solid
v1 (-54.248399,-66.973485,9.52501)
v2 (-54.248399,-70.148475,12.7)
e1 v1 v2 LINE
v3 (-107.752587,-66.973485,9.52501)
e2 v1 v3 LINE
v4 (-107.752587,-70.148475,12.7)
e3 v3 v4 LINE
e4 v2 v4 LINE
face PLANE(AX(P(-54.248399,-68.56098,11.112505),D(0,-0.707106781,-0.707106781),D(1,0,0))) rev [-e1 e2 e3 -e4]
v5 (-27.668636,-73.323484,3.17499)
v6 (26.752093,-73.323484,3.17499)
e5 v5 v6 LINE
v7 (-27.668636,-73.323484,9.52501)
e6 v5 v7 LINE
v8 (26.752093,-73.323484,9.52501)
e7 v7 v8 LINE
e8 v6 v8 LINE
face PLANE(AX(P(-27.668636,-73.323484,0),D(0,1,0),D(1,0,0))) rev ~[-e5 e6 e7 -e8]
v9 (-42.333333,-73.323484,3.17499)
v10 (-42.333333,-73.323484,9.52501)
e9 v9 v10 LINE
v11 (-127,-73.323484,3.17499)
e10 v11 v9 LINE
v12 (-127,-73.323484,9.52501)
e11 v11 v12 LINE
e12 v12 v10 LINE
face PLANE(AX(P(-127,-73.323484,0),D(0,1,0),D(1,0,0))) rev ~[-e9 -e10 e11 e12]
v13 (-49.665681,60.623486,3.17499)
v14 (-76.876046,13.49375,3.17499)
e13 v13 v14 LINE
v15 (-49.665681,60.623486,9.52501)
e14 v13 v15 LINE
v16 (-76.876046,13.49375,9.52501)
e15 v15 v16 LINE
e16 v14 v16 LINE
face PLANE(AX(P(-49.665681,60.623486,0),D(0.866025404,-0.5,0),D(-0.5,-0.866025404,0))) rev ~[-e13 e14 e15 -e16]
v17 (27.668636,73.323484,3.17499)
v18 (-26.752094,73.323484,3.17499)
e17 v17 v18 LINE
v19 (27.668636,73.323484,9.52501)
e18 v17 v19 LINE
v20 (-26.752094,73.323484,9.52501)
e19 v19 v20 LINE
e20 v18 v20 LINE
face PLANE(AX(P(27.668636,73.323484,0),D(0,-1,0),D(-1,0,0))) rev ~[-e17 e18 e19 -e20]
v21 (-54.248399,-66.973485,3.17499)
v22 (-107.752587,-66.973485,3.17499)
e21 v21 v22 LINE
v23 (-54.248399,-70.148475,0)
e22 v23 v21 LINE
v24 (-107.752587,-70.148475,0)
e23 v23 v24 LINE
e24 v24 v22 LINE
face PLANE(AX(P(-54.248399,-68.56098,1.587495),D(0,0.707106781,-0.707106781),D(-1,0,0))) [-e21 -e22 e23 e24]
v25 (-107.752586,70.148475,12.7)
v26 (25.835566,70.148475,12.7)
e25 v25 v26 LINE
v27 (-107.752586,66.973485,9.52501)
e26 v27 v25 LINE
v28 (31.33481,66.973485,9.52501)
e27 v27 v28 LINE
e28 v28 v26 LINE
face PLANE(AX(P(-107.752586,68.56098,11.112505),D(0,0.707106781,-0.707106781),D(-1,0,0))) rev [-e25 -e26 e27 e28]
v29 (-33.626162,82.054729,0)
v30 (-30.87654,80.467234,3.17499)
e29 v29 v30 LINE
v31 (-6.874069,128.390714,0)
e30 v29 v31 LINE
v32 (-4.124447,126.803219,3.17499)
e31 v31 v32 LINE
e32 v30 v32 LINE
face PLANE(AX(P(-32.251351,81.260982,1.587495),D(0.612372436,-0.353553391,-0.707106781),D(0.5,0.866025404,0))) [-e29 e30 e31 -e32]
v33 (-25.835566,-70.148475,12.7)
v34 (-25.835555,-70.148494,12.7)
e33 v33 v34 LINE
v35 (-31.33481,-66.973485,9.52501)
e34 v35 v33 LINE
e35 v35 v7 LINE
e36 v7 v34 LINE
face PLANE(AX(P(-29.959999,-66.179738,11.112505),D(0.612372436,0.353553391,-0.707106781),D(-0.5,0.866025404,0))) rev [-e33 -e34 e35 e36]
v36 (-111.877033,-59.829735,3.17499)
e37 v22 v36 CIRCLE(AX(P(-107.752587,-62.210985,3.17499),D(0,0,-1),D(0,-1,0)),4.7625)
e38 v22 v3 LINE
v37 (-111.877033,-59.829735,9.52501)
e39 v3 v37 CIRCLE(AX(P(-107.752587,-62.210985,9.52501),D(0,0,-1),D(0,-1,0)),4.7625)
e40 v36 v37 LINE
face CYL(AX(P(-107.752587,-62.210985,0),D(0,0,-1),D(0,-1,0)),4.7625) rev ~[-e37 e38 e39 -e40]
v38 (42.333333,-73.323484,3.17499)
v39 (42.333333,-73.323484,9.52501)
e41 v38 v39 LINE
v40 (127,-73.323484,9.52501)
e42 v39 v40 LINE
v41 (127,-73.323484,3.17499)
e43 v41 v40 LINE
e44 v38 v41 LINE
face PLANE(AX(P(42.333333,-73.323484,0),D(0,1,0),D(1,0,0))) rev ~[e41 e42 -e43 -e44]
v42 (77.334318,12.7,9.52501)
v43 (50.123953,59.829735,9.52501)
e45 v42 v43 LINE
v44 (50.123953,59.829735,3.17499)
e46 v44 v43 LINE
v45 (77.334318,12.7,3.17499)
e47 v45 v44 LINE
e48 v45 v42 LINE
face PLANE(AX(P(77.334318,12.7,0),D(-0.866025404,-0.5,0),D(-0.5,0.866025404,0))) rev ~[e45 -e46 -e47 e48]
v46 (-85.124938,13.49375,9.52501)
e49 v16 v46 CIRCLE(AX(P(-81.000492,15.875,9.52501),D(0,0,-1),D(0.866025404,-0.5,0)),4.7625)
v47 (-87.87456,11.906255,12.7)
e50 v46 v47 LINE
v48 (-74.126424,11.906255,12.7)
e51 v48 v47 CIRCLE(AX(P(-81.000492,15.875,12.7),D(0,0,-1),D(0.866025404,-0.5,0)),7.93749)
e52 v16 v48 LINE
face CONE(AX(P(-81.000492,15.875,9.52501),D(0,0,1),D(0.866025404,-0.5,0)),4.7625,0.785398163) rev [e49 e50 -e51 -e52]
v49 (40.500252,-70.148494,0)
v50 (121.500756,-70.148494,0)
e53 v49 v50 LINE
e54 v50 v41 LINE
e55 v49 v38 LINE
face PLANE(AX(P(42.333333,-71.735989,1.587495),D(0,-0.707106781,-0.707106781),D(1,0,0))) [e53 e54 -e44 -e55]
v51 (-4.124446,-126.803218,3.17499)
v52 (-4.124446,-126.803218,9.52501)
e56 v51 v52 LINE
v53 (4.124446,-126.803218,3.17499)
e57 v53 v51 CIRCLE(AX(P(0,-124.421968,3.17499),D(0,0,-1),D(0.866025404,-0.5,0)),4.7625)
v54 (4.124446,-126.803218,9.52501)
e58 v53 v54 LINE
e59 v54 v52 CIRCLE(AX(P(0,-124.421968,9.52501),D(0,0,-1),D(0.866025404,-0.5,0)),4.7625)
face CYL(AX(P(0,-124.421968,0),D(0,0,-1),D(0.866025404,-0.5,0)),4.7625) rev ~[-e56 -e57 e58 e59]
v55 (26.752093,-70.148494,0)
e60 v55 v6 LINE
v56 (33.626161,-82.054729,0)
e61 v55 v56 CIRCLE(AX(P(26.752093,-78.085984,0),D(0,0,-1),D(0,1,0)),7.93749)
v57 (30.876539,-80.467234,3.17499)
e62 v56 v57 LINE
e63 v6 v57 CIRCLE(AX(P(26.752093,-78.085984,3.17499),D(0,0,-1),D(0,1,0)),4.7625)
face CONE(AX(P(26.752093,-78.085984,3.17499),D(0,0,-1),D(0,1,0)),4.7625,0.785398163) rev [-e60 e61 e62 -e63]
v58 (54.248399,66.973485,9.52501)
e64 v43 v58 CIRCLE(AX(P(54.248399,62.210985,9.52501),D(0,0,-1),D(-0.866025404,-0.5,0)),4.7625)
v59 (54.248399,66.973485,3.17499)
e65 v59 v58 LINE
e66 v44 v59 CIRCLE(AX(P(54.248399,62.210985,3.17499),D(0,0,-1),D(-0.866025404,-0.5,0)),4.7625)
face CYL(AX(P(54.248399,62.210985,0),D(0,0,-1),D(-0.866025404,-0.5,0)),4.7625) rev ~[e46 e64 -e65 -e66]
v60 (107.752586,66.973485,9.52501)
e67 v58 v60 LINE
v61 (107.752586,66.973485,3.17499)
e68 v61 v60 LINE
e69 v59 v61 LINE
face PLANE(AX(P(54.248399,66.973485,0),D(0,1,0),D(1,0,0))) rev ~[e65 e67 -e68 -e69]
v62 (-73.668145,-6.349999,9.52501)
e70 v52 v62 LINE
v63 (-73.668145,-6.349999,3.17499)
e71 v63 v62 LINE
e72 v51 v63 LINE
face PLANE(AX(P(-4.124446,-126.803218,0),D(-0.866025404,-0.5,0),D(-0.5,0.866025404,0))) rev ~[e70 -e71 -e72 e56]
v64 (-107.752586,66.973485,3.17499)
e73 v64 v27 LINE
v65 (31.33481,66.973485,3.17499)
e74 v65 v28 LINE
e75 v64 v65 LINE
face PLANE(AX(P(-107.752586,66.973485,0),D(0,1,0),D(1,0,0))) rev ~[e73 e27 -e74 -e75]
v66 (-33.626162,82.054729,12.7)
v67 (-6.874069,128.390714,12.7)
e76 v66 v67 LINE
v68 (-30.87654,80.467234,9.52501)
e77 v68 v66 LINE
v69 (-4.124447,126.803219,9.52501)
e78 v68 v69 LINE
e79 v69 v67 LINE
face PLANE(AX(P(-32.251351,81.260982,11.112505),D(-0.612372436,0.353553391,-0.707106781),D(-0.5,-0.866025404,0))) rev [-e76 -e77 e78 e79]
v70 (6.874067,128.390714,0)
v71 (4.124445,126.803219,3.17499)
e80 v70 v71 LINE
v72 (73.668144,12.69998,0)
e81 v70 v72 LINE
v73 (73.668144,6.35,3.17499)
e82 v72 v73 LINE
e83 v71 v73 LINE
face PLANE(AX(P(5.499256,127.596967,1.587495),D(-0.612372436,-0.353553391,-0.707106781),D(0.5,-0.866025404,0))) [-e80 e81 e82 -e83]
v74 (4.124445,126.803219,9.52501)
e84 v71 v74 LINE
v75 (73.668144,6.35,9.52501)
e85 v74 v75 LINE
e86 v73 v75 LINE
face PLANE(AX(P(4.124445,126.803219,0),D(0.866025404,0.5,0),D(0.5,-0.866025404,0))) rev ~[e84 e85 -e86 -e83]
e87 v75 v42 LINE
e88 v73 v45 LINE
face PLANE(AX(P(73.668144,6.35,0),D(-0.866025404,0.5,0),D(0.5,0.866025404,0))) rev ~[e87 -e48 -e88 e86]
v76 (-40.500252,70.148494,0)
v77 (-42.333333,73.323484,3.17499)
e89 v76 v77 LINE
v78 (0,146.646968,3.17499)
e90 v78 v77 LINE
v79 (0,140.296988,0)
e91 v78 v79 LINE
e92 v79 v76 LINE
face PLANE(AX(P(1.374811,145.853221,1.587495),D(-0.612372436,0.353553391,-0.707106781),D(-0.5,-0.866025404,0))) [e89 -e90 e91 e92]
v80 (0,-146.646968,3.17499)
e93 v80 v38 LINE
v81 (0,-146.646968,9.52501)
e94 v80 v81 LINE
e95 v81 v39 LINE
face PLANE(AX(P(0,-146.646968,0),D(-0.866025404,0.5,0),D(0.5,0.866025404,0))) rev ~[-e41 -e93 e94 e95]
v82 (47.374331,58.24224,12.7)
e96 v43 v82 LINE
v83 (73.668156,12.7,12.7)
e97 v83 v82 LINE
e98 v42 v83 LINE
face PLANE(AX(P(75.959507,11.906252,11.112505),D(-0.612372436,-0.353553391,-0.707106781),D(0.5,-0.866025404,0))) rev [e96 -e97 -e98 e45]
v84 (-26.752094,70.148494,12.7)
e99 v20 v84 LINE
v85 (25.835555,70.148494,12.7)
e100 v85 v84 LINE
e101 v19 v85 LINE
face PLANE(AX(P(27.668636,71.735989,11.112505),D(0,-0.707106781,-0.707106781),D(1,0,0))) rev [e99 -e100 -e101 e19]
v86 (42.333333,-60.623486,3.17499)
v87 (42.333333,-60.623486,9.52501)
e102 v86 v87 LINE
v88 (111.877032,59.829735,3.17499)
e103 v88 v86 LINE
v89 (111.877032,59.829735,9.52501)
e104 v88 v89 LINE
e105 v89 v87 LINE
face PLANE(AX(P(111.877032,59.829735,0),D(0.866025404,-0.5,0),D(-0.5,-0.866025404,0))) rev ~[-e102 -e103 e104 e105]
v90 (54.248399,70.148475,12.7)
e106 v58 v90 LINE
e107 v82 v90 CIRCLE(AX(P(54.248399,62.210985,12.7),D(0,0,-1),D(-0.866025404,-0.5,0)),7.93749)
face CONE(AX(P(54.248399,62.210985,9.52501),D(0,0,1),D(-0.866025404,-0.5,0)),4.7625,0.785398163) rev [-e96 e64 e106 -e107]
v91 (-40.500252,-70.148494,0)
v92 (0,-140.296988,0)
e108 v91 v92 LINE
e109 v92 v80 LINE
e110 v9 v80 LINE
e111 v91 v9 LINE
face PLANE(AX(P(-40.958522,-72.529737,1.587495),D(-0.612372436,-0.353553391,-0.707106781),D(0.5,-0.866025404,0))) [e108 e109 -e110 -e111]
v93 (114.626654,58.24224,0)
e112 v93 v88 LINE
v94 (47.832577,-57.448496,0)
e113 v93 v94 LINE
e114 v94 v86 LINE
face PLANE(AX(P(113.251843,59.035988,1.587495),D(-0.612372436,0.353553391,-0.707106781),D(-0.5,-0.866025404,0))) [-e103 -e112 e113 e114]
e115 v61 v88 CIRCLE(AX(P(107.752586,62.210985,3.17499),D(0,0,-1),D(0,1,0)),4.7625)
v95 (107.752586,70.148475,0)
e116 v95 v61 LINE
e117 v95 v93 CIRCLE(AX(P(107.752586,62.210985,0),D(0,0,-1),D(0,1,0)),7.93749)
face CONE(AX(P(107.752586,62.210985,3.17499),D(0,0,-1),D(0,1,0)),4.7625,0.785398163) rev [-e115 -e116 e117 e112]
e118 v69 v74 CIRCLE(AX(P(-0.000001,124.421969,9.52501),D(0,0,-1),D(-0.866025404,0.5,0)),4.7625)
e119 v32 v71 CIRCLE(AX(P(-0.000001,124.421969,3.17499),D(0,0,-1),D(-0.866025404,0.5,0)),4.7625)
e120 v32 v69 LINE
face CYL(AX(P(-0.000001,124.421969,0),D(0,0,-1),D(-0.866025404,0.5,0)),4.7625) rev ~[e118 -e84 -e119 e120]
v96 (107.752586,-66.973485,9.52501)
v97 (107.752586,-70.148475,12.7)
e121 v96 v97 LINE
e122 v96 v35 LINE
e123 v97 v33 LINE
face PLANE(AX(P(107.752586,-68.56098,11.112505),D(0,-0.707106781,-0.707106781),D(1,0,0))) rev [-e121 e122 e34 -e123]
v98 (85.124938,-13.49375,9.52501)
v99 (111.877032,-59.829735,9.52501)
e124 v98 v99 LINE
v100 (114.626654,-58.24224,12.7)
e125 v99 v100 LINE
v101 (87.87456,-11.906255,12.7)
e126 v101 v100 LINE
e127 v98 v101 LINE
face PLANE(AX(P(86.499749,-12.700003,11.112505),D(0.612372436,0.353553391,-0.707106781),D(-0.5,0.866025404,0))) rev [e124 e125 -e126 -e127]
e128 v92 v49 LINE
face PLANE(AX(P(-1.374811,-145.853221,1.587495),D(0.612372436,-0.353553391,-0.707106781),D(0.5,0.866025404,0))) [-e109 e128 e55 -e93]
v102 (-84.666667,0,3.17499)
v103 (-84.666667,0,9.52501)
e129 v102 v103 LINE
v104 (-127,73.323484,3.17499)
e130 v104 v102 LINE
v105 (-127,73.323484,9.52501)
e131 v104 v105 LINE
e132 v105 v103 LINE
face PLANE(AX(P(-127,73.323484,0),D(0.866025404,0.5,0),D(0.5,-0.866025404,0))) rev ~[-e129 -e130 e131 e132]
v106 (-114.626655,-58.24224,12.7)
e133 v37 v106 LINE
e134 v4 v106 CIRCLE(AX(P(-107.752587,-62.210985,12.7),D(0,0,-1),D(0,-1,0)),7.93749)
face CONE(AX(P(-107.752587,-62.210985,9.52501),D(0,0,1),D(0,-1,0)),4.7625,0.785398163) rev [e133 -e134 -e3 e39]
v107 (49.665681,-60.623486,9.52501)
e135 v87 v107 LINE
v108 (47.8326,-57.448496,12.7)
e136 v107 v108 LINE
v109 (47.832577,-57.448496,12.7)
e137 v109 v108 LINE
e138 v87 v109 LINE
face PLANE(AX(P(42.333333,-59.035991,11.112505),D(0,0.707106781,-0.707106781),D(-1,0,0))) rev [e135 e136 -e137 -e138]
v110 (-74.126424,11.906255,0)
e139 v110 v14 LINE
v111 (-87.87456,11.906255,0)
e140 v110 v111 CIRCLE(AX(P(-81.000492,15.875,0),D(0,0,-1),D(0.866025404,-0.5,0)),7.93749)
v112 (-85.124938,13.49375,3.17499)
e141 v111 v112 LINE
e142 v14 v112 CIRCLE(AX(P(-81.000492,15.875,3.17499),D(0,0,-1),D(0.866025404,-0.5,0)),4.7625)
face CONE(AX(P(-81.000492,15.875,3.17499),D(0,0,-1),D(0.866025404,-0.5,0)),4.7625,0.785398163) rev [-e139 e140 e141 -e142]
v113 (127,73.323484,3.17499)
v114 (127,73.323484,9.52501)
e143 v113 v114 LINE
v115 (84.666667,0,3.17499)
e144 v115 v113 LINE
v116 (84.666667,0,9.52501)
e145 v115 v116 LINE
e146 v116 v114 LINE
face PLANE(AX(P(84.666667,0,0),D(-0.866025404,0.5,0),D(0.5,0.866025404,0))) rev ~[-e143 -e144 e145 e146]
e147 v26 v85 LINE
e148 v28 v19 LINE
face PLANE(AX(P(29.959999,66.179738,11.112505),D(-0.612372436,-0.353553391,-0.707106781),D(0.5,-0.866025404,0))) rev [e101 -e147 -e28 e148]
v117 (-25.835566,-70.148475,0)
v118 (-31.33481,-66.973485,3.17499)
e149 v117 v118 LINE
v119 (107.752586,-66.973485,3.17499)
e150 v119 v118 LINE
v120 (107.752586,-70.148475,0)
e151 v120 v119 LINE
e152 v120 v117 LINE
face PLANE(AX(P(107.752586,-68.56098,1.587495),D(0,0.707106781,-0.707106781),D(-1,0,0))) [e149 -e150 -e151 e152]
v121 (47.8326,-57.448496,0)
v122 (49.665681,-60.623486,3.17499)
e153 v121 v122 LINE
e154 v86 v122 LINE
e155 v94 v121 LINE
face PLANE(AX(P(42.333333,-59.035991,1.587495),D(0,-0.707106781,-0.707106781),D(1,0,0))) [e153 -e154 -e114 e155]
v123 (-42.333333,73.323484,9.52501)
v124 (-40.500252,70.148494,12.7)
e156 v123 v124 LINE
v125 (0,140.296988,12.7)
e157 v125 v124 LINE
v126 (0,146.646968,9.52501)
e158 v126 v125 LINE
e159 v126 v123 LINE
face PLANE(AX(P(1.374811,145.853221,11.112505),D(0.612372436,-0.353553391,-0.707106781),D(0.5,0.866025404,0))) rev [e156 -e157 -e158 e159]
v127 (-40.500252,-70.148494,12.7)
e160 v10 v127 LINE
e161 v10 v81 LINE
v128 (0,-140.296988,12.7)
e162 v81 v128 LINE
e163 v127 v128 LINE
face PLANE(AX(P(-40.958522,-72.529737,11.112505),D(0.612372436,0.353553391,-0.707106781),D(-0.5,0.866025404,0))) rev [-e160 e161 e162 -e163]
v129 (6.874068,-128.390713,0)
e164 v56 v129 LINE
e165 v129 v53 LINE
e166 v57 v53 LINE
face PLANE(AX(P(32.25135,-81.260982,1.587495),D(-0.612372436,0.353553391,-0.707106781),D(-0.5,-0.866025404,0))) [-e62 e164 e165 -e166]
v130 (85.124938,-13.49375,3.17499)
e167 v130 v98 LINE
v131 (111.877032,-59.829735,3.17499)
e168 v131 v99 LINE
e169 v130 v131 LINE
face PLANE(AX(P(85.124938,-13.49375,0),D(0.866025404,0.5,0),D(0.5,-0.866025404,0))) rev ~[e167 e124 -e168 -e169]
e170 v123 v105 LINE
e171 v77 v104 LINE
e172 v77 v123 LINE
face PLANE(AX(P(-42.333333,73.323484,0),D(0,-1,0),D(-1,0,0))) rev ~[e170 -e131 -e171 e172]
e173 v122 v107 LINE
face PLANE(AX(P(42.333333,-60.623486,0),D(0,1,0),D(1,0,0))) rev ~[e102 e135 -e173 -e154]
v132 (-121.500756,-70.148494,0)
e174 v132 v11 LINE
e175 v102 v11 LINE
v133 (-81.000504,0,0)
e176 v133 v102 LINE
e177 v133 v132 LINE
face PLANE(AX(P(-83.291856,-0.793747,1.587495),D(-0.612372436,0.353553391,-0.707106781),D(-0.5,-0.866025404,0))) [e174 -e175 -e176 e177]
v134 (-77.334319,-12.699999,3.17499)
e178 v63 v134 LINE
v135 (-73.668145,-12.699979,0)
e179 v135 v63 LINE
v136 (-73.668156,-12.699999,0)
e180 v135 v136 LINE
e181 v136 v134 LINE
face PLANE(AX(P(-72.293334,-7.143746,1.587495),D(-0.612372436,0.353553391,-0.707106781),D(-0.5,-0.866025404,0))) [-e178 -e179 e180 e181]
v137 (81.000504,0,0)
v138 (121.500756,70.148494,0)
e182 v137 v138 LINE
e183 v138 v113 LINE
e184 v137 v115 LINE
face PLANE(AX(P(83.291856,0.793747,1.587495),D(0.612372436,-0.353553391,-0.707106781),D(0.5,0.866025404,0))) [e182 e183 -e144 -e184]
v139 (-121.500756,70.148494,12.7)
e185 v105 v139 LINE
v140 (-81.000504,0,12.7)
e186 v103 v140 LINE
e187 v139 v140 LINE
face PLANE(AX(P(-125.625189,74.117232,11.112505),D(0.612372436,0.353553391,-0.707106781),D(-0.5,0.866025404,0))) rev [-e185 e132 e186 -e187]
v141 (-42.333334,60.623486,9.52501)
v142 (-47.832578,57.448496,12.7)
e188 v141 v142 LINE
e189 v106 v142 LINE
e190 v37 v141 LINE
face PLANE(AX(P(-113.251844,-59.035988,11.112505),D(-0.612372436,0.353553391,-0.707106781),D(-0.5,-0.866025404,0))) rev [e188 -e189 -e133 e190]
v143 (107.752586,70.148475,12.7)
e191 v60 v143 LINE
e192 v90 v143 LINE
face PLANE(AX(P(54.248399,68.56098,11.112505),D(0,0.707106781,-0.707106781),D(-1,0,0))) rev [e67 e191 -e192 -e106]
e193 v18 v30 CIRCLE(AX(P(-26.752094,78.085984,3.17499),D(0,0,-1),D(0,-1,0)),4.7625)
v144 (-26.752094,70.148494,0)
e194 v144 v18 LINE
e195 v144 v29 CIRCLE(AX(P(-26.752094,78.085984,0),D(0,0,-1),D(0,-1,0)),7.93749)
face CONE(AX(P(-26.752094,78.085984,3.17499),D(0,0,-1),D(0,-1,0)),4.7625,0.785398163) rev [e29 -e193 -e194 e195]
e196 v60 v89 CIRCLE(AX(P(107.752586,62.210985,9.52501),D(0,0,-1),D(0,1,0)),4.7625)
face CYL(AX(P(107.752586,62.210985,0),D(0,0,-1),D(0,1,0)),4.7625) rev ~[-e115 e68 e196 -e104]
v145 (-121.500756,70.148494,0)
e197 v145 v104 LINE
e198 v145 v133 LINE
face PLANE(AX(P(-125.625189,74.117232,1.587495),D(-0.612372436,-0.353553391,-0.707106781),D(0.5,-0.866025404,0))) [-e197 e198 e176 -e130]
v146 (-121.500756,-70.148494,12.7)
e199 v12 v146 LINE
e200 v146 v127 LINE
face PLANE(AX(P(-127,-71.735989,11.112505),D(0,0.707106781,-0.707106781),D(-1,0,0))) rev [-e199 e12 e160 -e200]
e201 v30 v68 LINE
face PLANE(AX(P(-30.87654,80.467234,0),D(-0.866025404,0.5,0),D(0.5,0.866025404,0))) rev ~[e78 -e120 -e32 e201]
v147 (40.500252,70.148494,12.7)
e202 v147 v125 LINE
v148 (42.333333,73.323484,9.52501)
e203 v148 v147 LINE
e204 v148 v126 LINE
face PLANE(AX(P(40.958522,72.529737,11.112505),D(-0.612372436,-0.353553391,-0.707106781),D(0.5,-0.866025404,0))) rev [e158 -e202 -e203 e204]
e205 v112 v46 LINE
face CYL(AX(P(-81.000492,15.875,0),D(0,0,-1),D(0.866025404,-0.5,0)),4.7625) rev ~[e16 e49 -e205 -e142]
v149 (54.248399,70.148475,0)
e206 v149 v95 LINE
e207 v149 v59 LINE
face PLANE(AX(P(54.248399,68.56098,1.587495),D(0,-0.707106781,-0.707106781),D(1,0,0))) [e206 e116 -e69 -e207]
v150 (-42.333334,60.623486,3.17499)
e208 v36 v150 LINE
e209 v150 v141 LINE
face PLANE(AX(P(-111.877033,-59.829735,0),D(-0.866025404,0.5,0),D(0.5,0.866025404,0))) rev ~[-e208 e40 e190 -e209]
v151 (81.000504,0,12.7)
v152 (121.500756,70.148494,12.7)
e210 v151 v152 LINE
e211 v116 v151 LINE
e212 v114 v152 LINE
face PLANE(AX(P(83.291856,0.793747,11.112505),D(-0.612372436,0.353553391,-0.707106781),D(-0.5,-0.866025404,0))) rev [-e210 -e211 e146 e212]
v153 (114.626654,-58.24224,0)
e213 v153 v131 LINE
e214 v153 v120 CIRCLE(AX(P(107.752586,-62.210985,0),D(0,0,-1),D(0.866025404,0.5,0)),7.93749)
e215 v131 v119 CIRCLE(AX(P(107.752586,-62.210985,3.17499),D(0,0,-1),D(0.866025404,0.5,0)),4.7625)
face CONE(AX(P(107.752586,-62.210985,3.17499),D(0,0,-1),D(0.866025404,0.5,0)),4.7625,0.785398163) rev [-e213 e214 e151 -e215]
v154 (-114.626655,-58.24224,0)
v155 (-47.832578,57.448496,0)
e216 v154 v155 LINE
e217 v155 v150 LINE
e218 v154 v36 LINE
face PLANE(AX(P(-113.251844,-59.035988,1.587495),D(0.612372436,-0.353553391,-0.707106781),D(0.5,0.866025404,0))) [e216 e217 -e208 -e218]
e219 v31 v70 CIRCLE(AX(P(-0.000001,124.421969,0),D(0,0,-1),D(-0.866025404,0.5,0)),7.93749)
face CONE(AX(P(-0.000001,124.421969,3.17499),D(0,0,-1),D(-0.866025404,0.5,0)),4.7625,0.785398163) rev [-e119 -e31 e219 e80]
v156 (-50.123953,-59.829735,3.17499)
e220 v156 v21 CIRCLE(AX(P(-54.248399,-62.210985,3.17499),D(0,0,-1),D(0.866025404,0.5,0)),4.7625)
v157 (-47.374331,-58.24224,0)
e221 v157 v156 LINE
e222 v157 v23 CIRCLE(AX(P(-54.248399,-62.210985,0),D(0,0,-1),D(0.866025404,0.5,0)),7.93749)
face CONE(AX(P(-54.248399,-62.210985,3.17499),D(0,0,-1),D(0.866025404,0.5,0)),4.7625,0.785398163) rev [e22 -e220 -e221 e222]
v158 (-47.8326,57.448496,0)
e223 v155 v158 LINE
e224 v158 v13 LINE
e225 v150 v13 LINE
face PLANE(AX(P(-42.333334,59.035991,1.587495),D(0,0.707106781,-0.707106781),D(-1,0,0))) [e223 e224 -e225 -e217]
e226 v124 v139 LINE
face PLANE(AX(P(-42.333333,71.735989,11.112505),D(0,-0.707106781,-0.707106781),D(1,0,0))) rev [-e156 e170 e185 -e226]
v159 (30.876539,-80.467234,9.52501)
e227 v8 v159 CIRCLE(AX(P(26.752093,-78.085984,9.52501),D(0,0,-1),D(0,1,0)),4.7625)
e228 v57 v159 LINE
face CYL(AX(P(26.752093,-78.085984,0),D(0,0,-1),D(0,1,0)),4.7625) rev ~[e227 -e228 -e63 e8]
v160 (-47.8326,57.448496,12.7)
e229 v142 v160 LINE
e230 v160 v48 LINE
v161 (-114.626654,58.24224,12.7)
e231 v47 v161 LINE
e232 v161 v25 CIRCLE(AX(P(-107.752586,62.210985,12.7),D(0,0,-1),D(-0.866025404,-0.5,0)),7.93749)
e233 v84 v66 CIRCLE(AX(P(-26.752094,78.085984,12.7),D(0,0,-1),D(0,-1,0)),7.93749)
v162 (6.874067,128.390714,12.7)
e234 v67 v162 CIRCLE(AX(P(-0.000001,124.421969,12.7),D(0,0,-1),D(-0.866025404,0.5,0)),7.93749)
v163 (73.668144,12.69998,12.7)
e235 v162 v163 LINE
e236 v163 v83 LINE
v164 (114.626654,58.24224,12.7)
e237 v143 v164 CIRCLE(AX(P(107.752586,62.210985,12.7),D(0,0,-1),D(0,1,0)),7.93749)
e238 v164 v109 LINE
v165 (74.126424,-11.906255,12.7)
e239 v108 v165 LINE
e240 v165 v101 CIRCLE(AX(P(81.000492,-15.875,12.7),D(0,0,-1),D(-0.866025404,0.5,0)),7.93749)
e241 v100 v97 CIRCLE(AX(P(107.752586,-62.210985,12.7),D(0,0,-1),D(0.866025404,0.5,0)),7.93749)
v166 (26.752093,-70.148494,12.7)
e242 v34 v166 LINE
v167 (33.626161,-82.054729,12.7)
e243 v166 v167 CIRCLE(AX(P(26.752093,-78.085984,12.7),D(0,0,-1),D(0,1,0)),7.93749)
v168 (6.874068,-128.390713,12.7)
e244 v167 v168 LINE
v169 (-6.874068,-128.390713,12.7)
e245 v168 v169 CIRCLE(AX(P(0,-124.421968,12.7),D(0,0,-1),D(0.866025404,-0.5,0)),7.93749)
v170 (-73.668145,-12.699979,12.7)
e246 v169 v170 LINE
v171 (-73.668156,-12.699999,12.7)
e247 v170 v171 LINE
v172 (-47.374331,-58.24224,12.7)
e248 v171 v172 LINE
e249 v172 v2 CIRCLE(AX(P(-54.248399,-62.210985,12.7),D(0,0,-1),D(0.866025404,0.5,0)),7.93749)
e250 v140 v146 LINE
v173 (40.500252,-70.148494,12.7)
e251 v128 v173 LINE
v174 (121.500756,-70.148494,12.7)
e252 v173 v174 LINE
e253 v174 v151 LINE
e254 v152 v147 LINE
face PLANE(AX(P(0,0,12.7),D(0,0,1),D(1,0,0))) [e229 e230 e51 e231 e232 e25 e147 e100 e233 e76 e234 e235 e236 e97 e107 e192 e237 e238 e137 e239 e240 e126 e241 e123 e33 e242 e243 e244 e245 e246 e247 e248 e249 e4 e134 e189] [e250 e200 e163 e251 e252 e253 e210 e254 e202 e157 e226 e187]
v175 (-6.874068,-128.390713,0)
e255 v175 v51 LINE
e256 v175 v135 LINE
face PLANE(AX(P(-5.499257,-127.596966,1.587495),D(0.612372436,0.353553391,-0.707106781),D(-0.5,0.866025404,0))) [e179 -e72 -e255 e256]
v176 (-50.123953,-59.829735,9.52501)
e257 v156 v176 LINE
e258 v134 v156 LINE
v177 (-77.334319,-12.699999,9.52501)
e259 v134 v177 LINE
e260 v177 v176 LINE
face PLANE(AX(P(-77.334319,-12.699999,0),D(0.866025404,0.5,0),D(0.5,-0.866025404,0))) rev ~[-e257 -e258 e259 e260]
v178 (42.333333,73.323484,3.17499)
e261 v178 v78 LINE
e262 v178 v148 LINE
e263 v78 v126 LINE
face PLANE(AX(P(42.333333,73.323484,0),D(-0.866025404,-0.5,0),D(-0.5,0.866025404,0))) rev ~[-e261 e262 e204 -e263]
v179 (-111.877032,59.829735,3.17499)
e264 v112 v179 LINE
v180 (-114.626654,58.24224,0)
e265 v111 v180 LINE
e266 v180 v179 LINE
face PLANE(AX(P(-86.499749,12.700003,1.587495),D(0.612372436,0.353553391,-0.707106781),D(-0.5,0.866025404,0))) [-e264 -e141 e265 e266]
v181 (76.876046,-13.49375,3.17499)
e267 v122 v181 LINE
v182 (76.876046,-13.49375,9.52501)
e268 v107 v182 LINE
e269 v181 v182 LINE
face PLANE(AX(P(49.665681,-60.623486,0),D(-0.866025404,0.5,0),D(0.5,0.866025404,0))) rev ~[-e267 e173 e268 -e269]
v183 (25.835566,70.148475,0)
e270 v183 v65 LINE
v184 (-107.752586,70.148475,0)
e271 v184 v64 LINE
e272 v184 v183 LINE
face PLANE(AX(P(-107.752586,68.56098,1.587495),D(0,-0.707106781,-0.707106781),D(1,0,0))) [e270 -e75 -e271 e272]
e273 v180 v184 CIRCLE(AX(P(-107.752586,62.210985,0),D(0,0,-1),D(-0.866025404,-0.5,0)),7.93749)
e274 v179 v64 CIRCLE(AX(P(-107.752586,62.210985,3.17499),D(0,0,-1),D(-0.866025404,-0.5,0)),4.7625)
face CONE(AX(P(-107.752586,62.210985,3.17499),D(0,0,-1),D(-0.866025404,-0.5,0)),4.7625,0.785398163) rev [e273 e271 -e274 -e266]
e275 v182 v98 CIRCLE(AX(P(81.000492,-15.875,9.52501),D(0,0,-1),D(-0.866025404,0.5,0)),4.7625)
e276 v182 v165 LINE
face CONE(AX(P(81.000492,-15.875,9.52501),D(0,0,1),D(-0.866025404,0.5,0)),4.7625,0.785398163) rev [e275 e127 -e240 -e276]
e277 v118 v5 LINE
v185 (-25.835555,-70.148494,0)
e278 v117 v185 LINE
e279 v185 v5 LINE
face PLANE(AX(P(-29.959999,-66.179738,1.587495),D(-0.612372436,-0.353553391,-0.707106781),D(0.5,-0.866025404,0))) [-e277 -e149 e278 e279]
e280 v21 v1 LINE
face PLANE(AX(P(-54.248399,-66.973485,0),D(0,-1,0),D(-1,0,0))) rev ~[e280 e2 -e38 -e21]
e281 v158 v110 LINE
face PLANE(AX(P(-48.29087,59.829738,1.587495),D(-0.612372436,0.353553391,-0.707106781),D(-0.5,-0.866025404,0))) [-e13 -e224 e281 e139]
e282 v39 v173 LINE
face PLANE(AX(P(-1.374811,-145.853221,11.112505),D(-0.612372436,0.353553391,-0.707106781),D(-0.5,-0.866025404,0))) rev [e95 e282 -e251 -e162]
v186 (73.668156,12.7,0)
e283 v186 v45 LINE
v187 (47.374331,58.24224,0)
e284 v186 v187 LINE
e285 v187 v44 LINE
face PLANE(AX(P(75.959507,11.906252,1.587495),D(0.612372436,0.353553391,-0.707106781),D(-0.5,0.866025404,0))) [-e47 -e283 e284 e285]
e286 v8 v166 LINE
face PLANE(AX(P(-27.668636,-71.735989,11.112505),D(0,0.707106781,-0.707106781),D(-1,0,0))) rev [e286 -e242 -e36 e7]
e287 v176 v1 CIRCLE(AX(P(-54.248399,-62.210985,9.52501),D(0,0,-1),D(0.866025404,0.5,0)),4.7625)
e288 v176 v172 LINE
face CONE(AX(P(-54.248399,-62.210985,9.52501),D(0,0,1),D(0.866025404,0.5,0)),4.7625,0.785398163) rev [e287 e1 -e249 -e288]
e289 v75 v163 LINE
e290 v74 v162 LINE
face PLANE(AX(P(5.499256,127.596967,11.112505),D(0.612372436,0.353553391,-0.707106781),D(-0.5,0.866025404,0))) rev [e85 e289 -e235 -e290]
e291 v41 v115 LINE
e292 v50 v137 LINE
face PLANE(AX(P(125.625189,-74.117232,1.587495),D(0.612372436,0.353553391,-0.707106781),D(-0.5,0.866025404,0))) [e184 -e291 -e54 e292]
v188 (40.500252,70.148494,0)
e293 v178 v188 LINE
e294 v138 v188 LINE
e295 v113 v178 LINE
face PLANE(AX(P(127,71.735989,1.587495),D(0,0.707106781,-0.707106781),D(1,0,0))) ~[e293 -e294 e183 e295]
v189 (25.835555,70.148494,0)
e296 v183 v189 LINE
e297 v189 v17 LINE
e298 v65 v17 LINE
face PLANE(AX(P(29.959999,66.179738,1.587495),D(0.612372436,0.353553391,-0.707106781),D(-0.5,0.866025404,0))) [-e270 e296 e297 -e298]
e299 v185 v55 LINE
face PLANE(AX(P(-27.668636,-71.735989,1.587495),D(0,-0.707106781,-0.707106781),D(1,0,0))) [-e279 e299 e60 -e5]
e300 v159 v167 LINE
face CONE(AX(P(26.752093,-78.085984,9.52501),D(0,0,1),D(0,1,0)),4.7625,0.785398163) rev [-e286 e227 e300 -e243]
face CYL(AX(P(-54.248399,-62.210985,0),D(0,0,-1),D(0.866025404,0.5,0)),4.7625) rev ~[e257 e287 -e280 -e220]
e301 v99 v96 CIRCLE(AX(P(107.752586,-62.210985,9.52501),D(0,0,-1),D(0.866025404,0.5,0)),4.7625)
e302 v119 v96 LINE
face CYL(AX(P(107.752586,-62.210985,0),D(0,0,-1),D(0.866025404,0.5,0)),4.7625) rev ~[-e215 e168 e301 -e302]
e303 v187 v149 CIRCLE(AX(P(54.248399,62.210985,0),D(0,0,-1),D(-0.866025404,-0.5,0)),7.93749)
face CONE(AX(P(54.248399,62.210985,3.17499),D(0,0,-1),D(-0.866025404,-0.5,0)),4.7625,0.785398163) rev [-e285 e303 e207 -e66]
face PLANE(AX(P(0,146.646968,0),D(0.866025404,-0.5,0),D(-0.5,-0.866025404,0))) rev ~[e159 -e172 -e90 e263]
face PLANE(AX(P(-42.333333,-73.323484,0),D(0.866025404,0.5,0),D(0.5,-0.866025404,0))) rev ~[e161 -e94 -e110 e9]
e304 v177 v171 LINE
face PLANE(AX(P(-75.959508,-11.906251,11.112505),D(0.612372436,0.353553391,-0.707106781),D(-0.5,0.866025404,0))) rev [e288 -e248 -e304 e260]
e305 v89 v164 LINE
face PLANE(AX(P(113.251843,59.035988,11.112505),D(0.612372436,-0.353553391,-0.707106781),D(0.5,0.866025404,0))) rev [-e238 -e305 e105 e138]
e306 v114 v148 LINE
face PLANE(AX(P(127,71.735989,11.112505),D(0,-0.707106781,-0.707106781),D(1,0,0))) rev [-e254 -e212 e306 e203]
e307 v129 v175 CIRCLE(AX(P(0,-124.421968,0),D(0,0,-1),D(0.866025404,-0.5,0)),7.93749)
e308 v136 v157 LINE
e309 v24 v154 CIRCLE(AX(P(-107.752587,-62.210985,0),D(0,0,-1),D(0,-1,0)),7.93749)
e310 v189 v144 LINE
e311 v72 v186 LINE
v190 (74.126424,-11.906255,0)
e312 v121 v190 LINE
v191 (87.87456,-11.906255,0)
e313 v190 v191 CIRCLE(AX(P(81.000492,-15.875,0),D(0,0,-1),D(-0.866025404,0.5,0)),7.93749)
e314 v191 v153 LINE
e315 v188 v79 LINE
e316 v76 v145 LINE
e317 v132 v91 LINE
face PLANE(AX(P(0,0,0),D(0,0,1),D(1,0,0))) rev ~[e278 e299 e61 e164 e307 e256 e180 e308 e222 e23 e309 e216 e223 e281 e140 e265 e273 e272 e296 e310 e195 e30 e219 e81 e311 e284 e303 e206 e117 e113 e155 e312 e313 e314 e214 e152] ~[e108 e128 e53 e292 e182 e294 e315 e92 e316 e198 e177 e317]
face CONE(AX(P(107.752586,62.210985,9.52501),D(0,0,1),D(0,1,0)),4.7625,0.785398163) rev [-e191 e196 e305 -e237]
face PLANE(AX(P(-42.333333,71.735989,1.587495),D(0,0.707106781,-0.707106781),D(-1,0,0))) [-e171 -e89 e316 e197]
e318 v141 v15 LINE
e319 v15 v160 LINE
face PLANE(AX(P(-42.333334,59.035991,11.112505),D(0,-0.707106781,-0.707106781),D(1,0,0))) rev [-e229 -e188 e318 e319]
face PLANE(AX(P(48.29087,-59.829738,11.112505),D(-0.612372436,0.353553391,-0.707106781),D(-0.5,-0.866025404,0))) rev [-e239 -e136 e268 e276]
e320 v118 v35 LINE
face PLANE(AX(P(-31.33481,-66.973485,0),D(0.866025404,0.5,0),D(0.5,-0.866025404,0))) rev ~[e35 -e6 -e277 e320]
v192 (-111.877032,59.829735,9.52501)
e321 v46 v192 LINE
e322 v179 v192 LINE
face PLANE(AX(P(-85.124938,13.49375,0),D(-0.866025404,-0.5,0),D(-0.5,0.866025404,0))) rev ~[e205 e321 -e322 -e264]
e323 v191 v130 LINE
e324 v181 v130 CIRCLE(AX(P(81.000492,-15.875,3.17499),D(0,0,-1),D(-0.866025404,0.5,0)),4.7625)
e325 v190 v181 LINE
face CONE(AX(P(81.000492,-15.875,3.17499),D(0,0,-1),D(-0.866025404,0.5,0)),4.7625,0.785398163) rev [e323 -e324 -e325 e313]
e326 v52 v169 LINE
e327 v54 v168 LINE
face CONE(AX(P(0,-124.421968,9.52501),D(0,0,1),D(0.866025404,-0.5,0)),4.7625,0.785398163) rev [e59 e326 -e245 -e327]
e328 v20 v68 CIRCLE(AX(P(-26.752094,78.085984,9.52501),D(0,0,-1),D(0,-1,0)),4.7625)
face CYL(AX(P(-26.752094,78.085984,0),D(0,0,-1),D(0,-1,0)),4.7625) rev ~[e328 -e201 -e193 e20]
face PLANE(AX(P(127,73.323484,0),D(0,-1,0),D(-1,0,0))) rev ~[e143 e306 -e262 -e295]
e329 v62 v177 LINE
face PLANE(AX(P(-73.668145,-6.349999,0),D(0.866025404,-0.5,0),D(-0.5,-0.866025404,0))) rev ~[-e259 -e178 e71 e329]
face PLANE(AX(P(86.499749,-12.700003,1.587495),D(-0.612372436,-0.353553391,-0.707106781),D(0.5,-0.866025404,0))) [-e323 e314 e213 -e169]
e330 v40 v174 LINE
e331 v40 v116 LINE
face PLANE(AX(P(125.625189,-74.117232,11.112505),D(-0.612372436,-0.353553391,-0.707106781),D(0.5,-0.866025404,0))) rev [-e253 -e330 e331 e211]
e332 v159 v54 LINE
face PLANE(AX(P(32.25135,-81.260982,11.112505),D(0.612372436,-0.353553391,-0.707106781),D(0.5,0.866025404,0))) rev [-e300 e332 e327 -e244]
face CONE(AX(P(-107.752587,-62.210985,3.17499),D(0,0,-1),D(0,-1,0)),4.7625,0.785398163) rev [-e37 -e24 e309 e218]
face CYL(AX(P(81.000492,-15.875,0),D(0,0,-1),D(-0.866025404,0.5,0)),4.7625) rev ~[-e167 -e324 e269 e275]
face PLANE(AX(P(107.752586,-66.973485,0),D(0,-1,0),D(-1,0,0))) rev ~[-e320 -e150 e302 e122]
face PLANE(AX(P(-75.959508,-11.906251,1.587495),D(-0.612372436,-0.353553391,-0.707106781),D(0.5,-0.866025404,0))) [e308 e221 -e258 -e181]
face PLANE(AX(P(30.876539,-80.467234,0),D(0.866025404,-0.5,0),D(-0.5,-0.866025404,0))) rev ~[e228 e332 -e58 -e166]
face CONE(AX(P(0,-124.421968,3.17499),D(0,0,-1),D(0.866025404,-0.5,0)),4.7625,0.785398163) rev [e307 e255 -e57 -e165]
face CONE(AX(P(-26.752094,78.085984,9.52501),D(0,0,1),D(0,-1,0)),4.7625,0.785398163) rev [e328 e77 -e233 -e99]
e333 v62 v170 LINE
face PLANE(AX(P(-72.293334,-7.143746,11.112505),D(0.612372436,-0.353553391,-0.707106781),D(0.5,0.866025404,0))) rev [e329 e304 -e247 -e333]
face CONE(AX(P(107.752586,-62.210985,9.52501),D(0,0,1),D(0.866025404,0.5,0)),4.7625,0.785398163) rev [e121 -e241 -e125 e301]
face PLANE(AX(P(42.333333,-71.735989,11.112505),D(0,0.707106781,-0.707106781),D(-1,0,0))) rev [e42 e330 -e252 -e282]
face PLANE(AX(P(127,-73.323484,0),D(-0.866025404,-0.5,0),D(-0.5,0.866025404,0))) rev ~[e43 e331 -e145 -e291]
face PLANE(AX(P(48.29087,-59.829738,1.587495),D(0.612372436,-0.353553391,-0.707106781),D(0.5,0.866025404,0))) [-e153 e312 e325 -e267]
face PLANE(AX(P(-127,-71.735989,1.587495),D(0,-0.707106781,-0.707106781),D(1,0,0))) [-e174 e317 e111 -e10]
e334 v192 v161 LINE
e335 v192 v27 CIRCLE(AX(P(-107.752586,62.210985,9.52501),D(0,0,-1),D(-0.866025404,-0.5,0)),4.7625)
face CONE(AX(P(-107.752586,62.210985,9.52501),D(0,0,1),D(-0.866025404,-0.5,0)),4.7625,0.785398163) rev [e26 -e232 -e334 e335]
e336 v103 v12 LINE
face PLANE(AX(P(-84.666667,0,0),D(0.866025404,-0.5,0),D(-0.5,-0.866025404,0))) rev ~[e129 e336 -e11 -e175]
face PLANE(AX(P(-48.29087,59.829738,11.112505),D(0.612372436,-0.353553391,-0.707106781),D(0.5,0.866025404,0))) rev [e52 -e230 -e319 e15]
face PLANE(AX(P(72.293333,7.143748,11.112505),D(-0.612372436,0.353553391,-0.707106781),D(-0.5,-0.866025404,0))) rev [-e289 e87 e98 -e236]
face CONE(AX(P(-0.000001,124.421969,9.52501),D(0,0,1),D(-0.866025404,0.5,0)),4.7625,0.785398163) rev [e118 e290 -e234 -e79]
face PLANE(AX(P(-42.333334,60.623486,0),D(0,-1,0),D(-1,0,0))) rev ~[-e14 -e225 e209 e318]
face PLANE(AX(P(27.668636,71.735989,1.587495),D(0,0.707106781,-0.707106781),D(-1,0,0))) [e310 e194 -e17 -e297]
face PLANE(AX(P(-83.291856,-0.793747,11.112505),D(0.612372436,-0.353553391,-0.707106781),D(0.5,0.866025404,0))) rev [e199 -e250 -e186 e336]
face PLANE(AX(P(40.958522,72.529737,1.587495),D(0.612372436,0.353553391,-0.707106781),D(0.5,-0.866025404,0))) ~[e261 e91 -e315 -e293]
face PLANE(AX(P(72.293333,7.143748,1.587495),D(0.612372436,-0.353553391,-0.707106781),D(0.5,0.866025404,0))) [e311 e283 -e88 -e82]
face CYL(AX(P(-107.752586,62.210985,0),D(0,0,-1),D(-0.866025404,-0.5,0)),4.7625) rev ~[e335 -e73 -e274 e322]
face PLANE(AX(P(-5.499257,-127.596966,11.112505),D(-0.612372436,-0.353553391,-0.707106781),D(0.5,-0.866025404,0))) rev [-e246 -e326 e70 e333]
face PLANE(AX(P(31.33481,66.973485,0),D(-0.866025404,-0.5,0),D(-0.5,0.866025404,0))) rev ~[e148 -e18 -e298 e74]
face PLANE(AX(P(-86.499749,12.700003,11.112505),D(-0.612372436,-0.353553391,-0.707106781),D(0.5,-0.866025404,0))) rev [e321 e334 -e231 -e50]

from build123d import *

# Parameters (mm, degrees)
F1_DEPTH = 12.7
F2_SIZE  = 3.17499
F3_SIZE  = 3.17499


# Not quite as in the source:
# - a fillet or chamfer is up to 0.001 mm smaller than in the source, because OpenCascade refuses the exact size


with BuildPart() as f1:
    # F0 (on Top) → F1 (new body)
    with BuildSketch(Plane.XY):
        Polygon((42.3333333333, 73.3234841871), (0, 146.6469683742), (-42.3333333333, 73.3234841871), (-127, 73.3234841871), (-84.6666666667, 0), (-127, -73.3234841871), (-42.3333333333, -73.3234841871), (0, -146.6469683742), (42.3333333333, -73.3234841871), (127, -73.3234841871), (84.6666666667, 0), (127, 73.3234841871), align=None)
        with BuildLine():
            ThreePointArc((107.7525859006, 66.9734850526), (111.8770318861, 64.5922350526), (111.8770318861, 59.8297350526))
            Line((111.8770318861, 59.8297350526), (42.3333325205, -60.623485595))
            Line((42.3333325205, -60.623485595), (49.6656809392, -60.623485595))
            Line((49.6656809392, -60.623485595), (76.8760464718, -13.49375))
            ThreePointArc((76.8760464718, -13.49375), (81.0004924573, -11.1125), (85.1249384428, -13.49375))
            Line((85.1249384428, -13.49375), (111.8770318861, -59.8297350526))
            ThreePointArc((111.8770318861, -59.8297350526), (111.8770318861, -64.5922350526), (107.7525859006, -66.9734850526))
            Line((107.7525859006, -66.9734850526), (-31.3348102056, -66.9734850526))
            Line((-31.3348102056, -66.9734850526), (-27.6686364959, -73.3234841871))
            Line((-27.6686364959, -73.3234841871), (26.7520929436, -73.3234841871))
            ThreePointArc((26.7520929436, -73.3234841871), (30.8765389291, -75.7047341871), (30.8765389291, -80.4672341871))
            Line((30.8765389291, -80.4672341871), (4.1244459855, -126.8032183742))
            ThreePointArc((4.1244459855, -126.8032183742), (0, -129.1844683742), (-4.1244459855, -126.8032183742))
            Line((-4.1244459855, -126.8032183742), (-73.6681446525, -6.3499989368))
            Line((-73.6681446525, -6.3499989368), (-77.3343188618, -12.6999989368))
            Line((-77.3343188618, -12.6999989368), (-50.1239530285, -59.8297350526))
            ThreePointArc((-50.1239530285, -59.8297350526), (-50.1239530285, -64.5922350526), (-54.2483990141, -66.9734850526))
            Line((-54.2483990141, -66.9734850526), (-107.7525871283, -66.9734850526))
            ThreePointArc((-107.7525871283, -66.9734850526), (-111.8770331138, -64.5922350526), (-111.8770331138, -59.8297350526))
            Line((-111.8770331138, -59.8297350526), (-42.3333337482, 60.623485595))
            Line((-42.3333337482, 60.623485595), (-49.6656809392, 60.623485595))
            Line((-49.6656809392, 60.623485595), (-76.8760464718, 13.49375))
            ThreePointArc((-76.8760464718, 13.49375), (-81.0004924573, 11.1125), (-85.1249384428, 13.49375))
            Line((-85.1249384428, 13.49375), (-111.8770318861, 59.8297350526))
            ThreePointArc((-111.8770318861, 59.8297350526), (-111.8770318861, 64.5922350526), (-107.7525859006, 66.9734850526))
            Line((-107.7525859006, 66.9734850526), (31.3348102056, 66.9734850526))
            Line((31.3348102056, 66.9734850526), (27.6686364959, 73.3234841871))
            Line((27.6686364959, 73.3234841871), (-26.7520941713, 73.3234841871))
            ThreePointArc((-26.7520941713, 73.3234841871), (-30.8765401568, 75.7047341871), (-30.8765401568, 80.4672341871))
            Line((-30.8765401568, 80.4672341871), (-4.1244465994, 126.8032194374))
            ThreePointArc((-4.1244465994, 126.8032194374), (-6.138e-07, 129.1844694374), (4.1244453717, 126.8032194374))
            Line((4.1244453717, 126.8032194374), (73.6681440386, 6.35))
            Line((73.6681440386, 6.35), (77.334318248, 12.7))
            Line((77.334318248, 12.7), (50.1239530285, 59.8297350526))
            ThreePointArc((50.1239530285, 59.8297350526), (50.1239530285, 64.5922350526), (54.248399014, 66.9734850526))
            Line((54.248399014, 66.9734850526), (107.7525859006, 66.9734850526))
        make_face(mode=Mode.SUBTRACT)
    extrude(amount=F1_DEPTH)

    # F2 (size 3.175 in the source; OpenCascade refuses exactly that, so slightly less here)
    f2_edges = [f1.edges().sort_by_distance(p)[0] for p in [
        (105.833333, -36.661742, 12.7),
        (105.833333, 36.661742, 12.7),
        (84.666667, 73.323484, 12.7),
        (21.166667, 109.985226, 12.7),
        (-21.166667, 109.985226, 12.7),
        (-84.666667, 73.323484, 12.7),
        (-105.833333, 36.661742, 12.7),
        (-105.833333, -36.661742, 12.7),
        (-84.666667, -73.323484, 12.7),
        (-21.166667, -109.985226, 12.7),
        (21.166667, -109.985226, 12.7),
        (84.666667, -73.323484, 12.7),
        (38.896295, 66.57661, 12.7),
        (75.501231, 9.525, 12.7),
        (63.729136, 36.264868, 12.7),
        (50.123953, 64.592235, 12.7),
        (81.000492, 66.973485, 12.7),
        (111.877032, 64.592235, 12.7),
        (77.105182, -0.396875, 12.7),
        (45.999507, -60.623486, 12.7),
        (63.270864, -37.058618, 12.7),
        (81.000492, -11.1125, 12.7),
        (98.500985, -36.661743, 12.7),
        (111.877032, -64.592235, 12.7),
        (38.208888, -66.973485, 12.7),
        (-29.501723, -70.148485, 12.7),
        (-0.458272, -73.323484, 12.7),
        (30.876539, -75.704734, 12.7),
        (17.500492, -103.635226, 12.7),
        (0, -129.184468, 12.7),
        (-38.896295, -66.576609, 12.7),
        (-75.501232, -9.524999, 12.7),
        (-63.729136, -36.264867, 12.7),
        (-50.123953, -64.592235, 12.7),
        (-81.000493, -66.973485, 12.7),
        (-111.877033, -64.592235, 12.7),
        (-77.105183, 0.396875, 12.7),
        (-45.999507, 60.623486, 12.7),
        (-63.270864, 37.058618, 12.7),
        (-81.000492, 11.1125, 12.7),
        (-98.500985, 36.661743, 12.7),
        (-111.877032, 64.592235, 12.7),
        (-38.208888, 66.973485, 12.7),
        (29.501723, 70.148485, 12.7),
        (0.458271, 73.323484, 12.7),
        (-30.87654, 75.704734, 12.7),
        (-17.500493, 103.635227, 12.7),
        (-1e-06, 129.184469, 12.7),
    ]]
    chamfer(f2_edges, length=F2_SIZE)

    # F3 (size 3.175 in the source; OpenCascade refuses exactly that, so slightly less here)
    f3_edges = [f1.edges().sort_by_distance(p)[0] for p in [
        (105.833333, -36.661742, 0),
        (105.833333, 36.661742, 0),
        (84.666667, 73.323484, 0),
        (21.166667, 109.985226, 0),
        (-21.166667, 109.985226, 0),
        (-84.666667, 73.323484, 0),
        (-105.833333, 36.661742, 0),
        (-105.833333, -36.661742, 0),
        (-84.666667, -73.323484, 0),
        (-21.166667, -109.985226, 0),
        (21.166667, -109.985226, 0),
        (84.666667, -73.323484, 0),
        (38.896295, 66.57661, 0),
        (75.501231, 9.525, 0),
        (63.729136, 36.264868, 0),
        (50.123953, 64.592235, 0),
        (81.000492, 66.973485, 0),
        (111.877032, 64.592235, 0),
        (77.105182, -0.396875, 0),
        (45.999507, -60.623486, 0),
        (63.270864, -37.058618, 0),
        (81.000492, -11.1125, 0),
        (98.500985, -36.661743, 0),
        (111.877032, -64.592235, 0),
        (38.208888, -66.973485, 0),
        (-29.501723, -70.148485, 0),
        (-0.458272, -73.323484, 0),
        (30.876539, -75.704734, 0),
        (17.500492, -103.635226, 0),
        (0, -129.184468, 0),
        (-38.896295, -66.576609, 0),
        (-75.501232, -9.524999, 0),
        (-63.729136, -36.264867, 0),
        (-50.123953, -64.592235, 0),
        (-81.000493, -66.973485, 0),
        (-111.877033, -64.592235, 0),
        (-77.105183, 0.396875, 0),
        (-45.999507, 60.623486, 0),
        (-63.270864, 37.058618, 0),
        (-81.000492, 11.1125, 0),
        (-98.500985, 36.661743, 0),
        (-111.877032, 64.592235, 0),
        (-38.208888, 66.973485, 0),
        (29.501723, 70.148485, 0),
        (0.458271, 73.323484, 0),
        (-30.87654, 75.704734, 0),
        (-17.500493, 103.635227, 0),
        (-1e-06, 129.184469, 0),
    ]]
    chamfer(f3_edges, length=F3_SIZE)


solid = f1.part
